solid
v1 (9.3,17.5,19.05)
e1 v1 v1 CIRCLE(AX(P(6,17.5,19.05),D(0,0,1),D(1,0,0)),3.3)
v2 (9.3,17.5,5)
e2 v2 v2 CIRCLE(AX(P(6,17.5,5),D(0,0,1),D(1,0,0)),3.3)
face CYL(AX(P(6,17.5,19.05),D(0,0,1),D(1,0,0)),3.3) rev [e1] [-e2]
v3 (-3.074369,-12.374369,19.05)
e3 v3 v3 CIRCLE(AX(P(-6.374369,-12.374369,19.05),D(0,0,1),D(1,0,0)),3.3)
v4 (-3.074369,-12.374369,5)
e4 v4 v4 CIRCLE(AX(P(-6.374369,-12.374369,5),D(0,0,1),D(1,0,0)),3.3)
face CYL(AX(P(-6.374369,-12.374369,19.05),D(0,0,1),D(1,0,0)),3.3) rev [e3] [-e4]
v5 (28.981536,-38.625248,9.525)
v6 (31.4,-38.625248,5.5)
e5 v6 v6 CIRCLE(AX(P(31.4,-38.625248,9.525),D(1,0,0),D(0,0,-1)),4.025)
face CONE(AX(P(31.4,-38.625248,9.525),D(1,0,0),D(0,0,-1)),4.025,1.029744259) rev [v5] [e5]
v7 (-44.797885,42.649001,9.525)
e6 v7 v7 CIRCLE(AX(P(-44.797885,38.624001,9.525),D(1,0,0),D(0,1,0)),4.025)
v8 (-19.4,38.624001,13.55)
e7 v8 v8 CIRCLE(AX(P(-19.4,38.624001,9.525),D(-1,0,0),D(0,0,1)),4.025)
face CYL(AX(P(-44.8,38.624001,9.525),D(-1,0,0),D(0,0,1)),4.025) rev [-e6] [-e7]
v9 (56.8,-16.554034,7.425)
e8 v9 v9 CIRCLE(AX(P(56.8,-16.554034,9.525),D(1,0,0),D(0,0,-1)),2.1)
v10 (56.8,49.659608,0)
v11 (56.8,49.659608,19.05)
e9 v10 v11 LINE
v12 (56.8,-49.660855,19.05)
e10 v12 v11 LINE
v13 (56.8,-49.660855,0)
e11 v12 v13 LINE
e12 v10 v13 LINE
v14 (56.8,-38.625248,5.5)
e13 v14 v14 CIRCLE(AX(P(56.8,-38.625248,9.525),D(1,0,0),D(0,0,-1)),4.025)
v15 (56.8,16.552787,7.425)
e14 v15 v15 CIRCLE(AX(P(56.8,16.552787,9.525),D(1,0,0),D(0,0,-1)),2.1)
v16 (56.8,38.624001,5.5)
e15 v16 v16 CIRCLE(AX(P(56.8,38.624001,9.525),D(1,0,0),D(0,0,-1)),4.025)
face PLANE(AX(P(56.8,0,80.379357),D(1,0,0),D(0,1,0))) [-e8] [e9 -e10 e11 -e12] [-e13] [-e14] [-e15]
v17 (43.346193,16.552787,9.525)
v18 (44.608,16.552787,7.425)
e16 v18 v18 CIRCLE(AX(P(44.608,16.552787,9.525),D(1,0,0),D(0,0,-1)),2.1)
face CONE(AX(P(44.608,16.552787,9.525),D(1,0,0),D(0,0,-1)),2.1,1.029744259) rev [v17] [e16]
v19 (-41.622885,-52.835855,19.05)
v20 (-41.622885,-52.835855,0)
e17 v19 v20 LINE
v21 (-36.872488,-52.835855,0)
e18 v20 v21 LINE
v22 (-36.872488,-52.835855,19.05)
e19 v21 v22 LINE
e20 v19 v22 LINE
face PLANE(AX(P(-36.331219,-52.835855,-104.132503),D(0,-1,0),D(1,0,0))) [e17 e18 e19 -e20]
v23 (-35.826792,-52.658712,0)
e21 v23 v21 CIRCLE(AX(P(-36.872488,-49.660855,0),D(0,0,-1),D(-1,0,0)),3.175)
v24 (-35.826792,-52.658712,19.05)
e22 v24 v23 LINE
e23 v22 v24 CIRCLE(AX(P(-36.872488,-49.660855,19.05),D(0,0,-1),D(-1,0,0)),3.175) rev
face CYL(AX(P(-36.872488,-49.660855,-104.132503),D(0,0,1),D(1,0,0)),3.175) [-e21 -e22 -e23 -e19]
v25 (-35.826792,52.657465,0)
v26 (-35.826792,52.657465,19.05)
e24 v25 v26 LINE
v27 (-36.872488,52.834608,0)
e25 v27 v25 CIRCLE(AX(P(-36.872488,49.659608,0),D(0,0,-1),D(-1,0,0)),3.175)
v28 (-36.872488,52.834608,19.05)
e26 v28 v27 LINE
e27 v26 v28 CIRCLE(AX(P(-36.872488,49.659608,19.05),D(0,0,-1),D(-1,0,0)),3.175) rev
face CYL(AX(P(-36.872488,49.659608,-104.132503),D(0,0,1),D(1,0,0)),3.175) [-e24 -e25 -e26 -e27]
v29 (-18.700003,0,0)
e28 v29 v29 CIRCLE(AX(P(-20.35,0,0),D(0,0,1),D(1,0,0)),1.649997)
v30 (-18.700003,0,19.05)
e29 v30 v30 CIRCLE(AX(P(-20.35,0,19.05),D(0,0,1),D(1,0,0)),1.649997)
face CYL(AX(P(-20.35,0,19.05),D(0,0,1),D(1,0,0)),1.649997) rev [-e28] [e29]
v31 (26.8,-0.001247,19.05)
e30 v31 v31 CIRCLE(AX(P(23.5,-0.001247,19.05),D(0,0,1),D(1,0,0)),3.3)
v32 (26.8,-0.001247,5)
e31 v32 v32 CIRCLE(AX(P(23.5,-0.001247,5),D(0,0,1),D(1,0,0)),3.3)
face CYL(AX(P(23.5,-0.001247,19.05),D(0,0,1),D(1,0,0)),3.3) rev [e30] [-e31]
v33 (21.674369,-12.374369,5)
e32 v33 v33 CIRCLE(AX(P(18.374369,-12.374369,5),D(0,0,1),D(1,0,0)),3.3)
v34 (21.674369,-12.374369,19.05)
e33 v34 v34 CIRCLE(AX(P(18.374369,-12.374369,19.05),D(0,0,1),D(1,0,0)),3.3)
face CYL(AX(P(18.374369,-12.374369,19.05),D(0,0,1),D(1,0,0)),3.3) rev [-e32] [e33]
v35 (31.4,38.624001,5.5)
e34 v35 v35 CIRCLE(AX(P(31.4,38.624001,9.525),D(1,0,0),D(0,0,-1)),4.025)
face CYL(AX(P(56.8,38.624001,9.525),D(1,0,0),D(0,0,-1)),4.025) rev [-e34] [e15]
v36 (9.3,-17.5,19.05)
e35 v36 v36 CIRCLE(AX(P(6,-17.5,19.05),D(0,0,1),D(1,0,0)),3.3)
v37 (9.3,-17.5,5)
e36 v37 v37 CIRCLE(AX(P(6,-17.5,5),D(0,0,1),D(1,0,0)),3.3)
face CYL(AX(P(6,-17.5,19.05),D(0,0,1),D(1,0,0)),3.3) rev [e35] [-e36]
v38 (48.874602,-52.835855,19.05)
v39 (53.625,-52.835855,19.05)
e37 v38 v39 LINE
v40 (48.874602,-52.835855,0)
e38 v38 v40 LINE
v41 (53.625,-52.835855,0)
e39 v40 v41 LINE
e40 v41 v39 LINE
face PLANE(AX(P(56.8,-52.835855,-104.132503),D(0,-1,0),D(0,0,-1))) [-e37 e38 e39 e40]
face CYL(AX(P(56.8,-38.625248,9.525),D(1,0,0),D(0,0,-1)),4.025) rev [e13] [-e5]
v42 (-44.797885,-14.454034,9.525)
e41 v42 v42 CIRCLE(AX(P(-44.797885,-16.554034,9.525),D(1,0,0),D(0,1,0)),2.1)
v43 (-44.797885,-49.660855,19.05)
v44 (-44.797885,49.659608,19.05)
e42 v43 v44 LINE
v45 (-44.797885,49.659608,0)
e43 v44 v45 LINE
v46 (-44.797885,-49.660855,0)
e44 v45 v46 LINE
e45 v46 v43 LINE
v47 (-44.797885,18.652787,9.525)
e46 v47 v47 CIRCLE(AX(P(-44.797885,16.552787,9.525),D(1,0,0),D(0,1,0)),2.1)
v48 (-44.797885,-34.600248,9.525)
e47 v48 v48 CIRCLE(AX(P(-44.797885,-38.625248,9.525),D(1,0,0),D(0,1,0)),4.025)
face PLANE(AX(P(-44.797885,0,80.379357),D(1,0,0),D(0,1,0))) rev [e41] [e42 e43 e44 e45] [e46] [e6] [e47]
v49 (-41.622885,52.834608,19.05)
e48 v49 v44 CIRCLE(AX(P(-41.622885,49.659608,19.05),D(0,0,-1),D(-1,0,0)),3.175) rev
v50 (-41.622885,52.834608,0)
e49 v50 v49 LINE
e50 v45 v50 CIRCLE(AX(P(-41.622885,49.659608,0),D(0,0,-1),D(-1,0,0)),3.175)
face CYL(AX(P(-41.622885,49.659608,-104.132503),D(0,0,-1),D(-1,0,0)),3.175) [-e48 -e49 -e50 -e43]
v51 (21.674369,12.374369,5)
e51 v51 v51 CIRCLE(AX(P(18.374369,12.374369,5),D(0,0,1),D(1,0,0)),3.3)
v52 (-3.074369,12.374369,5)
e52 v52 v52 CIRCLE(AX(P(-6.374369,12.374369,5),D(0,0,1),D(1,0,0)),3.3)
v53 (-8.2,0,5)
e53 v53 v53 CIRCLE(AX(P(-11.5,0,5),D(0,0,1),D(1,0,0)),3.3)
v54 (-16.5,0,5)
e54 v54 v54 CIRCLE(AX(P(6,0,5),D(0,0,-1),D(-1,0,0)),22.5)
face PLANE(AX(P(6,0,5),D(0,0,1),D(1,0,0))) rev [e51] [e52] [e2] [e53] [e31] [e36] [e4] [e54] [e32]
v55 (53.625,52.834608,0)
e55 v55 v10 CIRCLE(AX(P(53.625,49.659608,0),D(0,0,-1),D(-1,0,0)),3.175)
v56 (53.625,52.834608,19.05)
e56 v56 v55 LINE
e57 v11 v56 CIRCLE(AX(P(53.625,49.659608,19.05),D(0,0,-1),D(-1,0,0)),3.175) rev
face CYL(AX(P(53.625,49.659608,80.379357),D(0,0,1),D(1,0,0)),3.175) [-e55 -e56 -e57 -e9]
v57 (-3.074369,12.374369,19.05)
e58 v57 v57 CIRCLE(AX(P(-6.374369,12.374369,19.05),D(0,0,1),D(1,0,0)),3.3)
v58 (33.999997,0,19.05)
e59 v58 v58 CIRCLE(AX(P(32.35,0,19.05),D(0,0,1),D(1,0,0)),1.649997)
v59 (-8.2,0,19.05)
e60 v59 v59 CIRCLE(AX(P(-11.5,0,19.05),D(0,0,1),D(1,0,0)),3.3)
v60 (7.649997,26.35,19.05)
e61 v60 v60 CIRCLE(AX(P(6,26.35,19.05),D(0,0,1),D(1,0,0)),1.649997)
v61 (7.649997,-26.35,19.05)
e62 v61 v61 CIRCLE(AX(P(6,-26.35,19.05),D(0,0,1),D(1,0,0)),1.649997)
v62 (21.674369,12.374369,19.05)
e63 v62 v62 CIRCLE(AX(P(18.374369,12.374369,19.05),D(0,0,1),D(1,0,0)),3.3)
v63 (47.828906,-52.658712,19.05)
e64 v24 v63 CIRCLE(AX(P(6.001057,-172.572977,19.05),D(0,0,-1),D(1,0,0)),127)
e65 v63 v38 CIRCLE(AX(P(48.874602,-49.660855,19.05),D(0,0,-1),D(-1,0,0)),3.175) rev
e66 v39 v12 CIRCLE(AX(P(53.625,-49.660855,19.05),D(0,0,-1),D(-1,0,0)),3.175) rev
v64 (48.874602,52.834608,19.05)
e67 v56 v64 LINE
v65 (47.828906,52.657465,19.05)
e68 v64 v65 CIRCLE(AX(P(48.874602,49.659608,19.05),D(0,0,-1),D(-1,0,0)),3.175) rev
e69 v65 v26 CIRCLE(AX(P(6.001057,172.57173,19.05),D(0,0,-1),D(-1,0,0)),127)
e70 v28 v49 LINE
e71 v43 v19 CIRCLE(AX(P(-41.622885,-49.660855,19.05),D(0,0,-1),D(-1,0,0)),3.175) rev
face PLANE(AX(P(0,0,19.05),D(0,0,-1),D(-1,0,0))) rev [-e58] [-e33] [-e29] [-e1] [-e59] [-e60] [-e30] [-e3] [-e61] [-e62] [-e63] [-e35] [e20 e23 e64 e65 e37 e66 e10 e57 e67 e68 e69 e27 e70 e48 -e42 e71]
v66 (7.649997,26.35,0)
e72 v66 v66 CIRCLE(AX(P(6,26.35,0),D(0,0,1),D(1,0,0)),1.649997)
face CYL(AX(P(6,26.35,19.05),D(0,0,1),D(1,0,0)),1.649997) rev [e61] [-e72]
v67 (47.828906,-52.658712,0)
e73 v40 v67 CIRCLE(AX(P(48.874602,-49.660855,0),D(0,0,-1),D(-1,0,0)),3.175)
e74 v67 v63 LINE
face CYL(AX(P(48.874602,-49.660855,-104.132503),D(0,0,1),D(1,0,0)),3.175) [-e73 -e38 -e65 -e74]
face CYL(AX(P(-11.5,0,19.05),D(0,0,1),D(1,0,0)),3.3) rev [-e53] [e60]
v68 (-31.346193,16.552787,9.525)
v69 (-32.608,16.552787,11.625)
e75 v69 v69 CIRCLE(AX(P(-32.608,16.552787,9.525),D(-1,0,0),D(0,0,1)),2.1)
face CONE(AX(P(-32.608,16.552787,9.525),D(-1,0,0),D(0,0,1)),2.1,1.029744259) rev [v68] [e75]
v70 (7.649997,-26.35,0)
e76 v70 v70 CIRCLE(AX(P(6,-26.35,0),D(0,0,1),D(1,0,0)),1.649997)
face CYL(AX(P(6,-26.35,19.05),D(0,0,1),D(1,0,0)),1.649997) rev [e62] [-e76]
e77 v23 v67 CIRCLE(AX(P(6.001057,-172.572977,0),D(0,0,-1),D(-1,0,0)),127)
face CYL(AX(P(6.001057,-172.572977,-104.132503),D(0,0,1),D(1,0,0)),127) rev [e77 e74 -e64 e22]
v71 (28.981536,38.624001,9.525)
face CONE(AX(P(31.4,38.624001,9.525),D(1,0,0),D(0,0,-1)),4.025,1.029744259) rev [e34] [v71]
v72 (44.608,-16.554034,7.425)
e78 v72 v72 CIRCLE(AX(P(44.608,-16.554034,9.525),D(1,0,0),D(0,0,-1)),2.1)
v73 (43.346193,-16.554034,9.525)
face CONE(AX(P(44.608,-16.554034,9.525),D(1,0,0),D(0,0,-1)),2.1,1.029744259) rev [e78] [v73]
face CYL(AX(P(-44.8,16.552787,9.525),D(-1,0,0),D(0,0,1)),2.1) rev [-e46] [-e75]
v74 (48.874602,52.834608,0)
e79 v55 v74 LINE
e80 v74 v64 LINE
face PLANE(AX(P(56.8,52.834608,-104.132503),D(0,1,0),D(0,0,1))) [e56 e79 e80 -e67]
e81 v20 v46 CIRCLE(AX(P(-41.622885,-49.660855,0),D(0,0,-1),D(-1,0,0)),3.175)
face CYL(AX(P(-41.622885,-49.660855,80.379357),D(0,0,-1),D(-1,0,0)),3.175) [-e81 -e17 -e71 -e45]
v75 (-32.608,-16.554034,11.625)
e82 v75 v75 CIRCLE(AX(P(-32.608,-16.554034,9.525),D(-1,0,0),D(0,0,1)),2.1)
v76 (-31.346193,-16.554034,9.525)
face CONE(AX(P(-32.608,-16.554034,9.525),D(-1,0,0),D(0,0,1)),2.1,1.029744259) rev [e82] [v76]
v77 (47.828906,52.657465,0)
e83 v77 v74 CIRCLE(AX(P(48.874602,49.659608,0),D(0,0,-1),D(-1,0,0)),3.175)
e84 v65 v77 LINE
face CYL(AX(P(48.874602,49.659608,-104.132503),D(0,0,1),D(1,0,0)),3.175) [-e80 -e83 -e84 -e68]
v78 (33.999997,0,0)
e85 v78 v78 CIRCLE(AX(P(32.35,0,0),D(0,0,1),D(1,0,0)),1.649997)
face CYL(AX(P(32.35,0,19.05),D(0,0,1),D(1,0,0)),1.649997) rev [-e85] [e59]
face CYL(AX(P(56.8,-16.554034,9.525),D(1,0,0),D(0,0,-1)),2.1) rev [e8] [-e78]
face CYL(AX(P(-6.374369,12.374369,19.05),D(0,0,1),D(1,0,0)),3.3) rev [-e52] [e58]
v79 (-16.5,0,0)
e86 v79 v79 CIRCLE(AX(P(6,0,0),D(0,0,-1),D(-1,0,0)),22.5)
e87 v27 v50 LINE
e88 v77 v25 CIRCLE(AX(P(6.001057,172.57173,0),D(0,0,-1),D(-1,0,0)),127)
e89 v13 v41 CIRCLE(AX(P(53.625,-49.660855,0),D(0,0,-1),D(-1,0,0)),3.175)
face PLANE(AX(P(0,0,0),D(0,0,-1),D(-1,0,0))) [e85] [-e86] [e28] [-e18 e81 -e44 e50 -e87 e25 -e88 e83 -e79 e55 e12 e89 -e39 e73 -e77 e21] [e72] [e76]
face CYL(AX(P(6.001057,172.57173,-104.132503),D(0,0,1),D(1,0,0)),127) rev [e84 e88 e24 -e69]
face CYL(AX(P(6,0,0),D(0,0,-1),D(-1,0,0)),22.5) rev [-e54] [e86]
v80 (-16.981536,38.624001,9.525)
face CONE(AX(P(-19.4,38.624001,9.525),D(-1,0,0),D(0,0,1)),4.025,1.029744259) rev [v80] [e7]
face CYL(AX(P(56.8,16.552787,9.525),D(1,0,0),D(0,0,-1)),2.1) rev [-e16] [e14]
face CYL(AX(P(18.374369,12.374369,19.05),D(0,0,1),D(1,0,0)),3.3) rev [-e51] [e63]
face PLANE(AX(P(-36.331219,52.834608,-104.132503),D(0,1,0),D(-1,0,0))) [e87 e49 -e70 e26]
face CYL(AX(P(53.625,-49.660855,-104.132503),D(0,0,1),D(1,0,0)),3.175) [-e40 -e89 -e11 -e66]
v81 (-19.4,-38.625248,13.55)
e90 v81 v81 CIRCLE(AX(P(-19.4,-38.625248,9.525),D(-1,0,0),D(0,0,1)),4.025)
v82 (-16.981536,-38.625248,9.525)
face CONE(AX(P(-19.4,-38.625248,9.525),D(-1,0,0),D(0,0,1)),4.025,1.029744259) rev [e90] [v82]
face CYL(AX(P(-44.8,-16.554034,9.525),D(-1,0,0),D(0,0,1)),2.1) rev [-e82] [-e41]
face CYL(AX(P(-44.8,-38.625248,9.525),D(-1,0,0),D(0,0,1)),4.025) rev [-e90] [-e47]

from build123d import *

# Parameters (mm, degrees)
BOSS_EXTRUDE1_DEPTH                         = 19.05
F_1_3_4_CLEARANCE_HOLE1_D                   = 45
F_1_3_4_CLEARANCE_HOLE1_DEPTH               = 5
F_1_4_CLEARANCE_HOLE3_D                     = 6.6
F_1_4_CLEARANCE_HOLE3_DEPTH                 = 19.05
BOSS_EXTRUDE2_DEPTH                         = 19.05
SKETCH21_R                                  = 30
CUT_EXTRUDE1_DEPTH                          = 81.6728269
BOSS_EXTRUDE5_DEPTH                         = 19.05
BOSS_EXTRUDE6_DEPTH                         = 19.05
FILLET2_R                                   = 13
SKETCH29_W                                  = 12.7
SKETCH29_H                                  = 60
BOSS_EXTRUDE7_DEPTH                         = 19.05
BOSS_EXTRUDE8_START                         = -19.05
BOSS_EXTRUDE8_DEPTH                         = 19.05
FILLET3_R                                   = 3.175
F_8_0MM_DOWEL_HOLE1_AT_2_COUNT              = 2
F_8_0MM_DOWEL_HOLE1_AT_2_PITCH              = 77.249249372
TAPPED_HOLE_FOR_M4X0_7_HELICOIL1_AT_2_COUNT = 2
TAPPED_HOLE_FOR_M4X0_7_HELICOIL1_AT_2_PITCH = 33.106821059
F_4_CLEARANCE_HOLE2_D                       = 3.2999934


# Read off the part's stored shape, not the designer's step: Markup2
with BuildPart() as part:
    # Sketch1 → Boss-Extrude1 (new body)
    with BuildSketch(Plane(origin=(0, 0, 0), x_dir=(-1, 0, 0), z_dir=(0, 0, -1))):
        with BuildLine():
            Line((44.45, 0), (44.45, 60))
            Line((44.45, 60), (-44.45, 60))
            Line((-44.45, 60), (-44.45, 0))
            ThreePointArc((-44.45, 0), (0, -44.45), (44.45, 0))
        make_face()
    extrude(amount=-BOSS_EXTRUDE1_DEPTH)

    # 1-3/4 Clearance Hole1
    with Locations(Plane(origin=(0, 0, 0), x_dir=(-1, 0, 0), z_dir=(0, 0, -1))):
        with Locations((-6, 0)):
            Hole(F_1_3_4_CLEARANCE_HOLE1_D / 2, depth=F_1_3_4_CLEARANCE_HOLE1_DEPTH)

    # 1/4 Clearance Hole3
    with Locations(Plane.XY.offset(19.05)):
        with Locations((18.374368671, 12.374368671), (23.499999956, -0.001247108), (18.374368671, -12.374368671), (6, -17.5), (-6.374368671, -12.374368671), (-11.5, 0), (-6.374368671, 12.374368671), (6, 17.5)):
            Hole(F_1_4_CLEARANCE_HOLE3_D / 2, depth=F_1_4_CLEARANCE_HOLE3_DEPTH)

    # Sketch18 → Boss-Extrude2 (add)
    with BuildSketch(Plane(origin=(0, 0, 0), x_dir=(-1, 0, 0), z_dir=(0, 0, -1))):
        with BuildLine():
            Line((-44.45, 0), (-50.45, 0))
            ThreePointArc((-50.45, 0), (-37.430896424, -31.430896424), (-6, -44.45))
            Line((-6, -44.45), (0, -44.45))
            ThreePointArc((0, -44.45), (-31.430896424, -31.430896424), (-44.45, 0))
        make_face()
    extrude(amount=-BOSS_EXTRUDE2_DEPTH)

    # Sketch21 → Cut-Extrude1 (cut, through all)
    with BuildSketch(Plane.XY.offset(19.05)):
        with BuildLine():
            Line((-44.45, 60), (-44.45, 0))
            ThreePointArc((-44.45, 0), (-31.430896424, -31.430896424), (0, -44.45))
            Line((0, -44.45), (6, -44.45))
            ThreePointArc((6, -44.45), (37.430896424, -31.430896424), (50.45, 0))
            Line((50.45, 0), (44.45, 0))
            Line((44.45, 0), (44.45, 60))
            Line((44.45, 60), (-44.45, 60))
        make_face()
        with Locations((5.999999978, -0.000623554)):
            Circle(SKETCH21_R, mode=Mode.SUBTRACT)
    extrude(amount=-CUT_EXTRUDE1_DEPTH, mode=Mode.SUBTRACT)

    # Sketch22 → Boss-Extrude5 (add)
    with BuildSketch(Plane.XY.offset(19.05)):
        with BuildLine():
            Line((44.099999978, -30.000623554), (44.099999978, 29.999376446))
            Line((44.099999978, 29.999376446), (5.999999978, 29.999376446))
            ThreePointArc((5.999999978, 29.999376446), (35.999999978, -0.000623554), (5.999999978, -30.000623554))
            Line((5.999999978, -30.000623554), (44.099999978, -30.000623554))
        make_face()
    boss_extrude5 = extrude(amount=-BOSS_EXTRUDE5_DEPTH)

    # Mirror1: Boss-Extrude5 across plane
    add(boss_extrude5.mirror(Plane(origin=(5.999999978, 0, 0), x_dir=(0, 0, 1), z_dir=(1, 0, 0))))

    # Sketch28 → Boss-Extrude6 (add)
    with BuildSketch(Plane.XY.offset(19.05)):
        with BuildLine():
            Line((-26.798858004, 29.999376446), (38.798858004, 29.999376446))
            ThreePointArc((38.798858004, 29.999376446), (6, 44.448752892), (-26.798858004, 29.999376446))
        make_face()
        with BuildLine():
            ThreePointArc((-26.798858004, -30.000623554), (6, -44.45), (38.798858004, -30.000623554))
            Line((38.798858004, -30.000623554), (-26.798858004, -30.000623554))
        make_face()
    extrude(amount=-BOSS_EXTRUDE6_DEPTH)

    # Fillet2
    fillet2_edges = [part.edges().sort_by_distance(p)[0] for p in [
        (-26.798858004, 29.999376446, 9.525),
        (38.798858004, 29.999376446, 9.525),
        (38.798858004, -30.000623554, 9.525),
        (-26.798858004, -30.000623554, 9.525),
    ]]
    fillet(fillet2_edges, radius=FILLET2_R)

    # Sketch29 → Boss-Extrude7 (add)
    with BuildSketch(Plane.XY):
        with Locations((50.449999978, -0.000623554)):
            Rectangle(SKETCH29_W, SKETCH29_H)
        with Locations((-38.447885426, -0.000623554)):
            Rectangle(SKETCH29_W, SKETCH29_H)
    extrude(amount=BOSS_EXTRUDE7_DEPTH)

    # Sketch40 → Boss-Extrude8 (add)
    with BuildSketch(Plane.XY.offset(19.05).offset(BOSS_EXTRUDE8_START)):
        with BuildLine():
            Line((56.799999978, -30.000623554), (44.097885426, -30.000623554))
            ThreePointArc((44.097885426, -30.000623554), (39.487811488, -30.845492198), (35.476953998, -33.27028228))
            ThreePointArc((35.476953998, -33.27028228), (6, -44.45), (-23.476953998, -33.27028228))
            ThreePointArc((-23.476953998, -33.27028228), (-27.487811488, -30.845492198), (-32.097885426, -30.000623554))
            Line((-32.097885426, -30.000623554), (-44.797885426, -30.000623554))
            Line((-44.797885426, -30.000623554), (-44.797885426, -52.835855224))
            Line((-44.797885426, -52.835855224), (-36.33121876, -52.835855224))
            ThreePointArc((-36.33121876, -52.835855224), (6.001057276, -45.572977311), (48.333333311, -52.835855224))
            Line((48.333333311, -52.835855224), (56.799999978, -52.835855224))
            Line((56.799999978, -52.835855224), (56.799999978, -30.000623554))
        make_face()
        with BuildLine():
            Line((-36.33121876, 52.834608116), (-44.797885426, 52.834608116))
            Line((-44.797885426, 52.834608116), (-44.797885426, 29.999376446))
            Line((-44.797885426, 29.999376446), (-32.097885426, 29.999376446))
            ThreePointArc((-32.097885426, 29.999376446), (-27.487811488, 30.84424509), (-23.476953998, 33.269035172))
            ThreePointArc((-23.476953998, 33.269035172), (6, 44.448752892), (35.476953998, 33.269035172))
            ThreePointArc((35.476953998, 33.269035172), (39.487811488, 30.84424509), (44.097885426, 29.999376446))
            Line((44.097885426, 29.999376446), (56.799999978, 29.999376446))
            Line((56.799999978, 29.999376446), (56.799999978, 52.834608116))
            Line((56.799999978, 52.834608116), (48.333333311, 52.834608116))
            ThreePointArc((48.333333311, 52.834608116), (6.001057276, 45.571730203), (-36.33121876, 52.834608116))
        make_face()
    extrude(amount=BOSS_EXTRUDE8_DEPTH)

    # Fillet3
    fillet3_edges = [part.edges().sort_by_distance(p)[0] for p in [
        (-44.797885426, -52.835855224, 9.525),
        (-36.33121876, -52.835855224, 9.525),
        (48.333333311, -52.835855224, 9.525),
        (56.799999978, -52.835855224, 9.525),
        (56.799999978, 52.834608116, 9.525),
        (48.333333311, 52.834608116, 9.525),
        (-36.33121876, 52.834608116, 9.525),
        (-44.797885426, 52.834608116, 9.525),
    ]]
    fillet(fillet3_edges, radius=FILLET3_R)

    # Sketch49 → Ø8.0mm Dowel Hole1 (revolve, cut)
    with BuildSketch(Plane(origin=(56.799999978, 38.624001078, 9.525), x_dir=(0, 0, -1), z_dir=(0, 1, 0))):
        Polygon((0, 0), (0, 27.818463992), (4.025, 25.4), (4.025, 0), align=None)
    f_8_0mm_dowel_hole1 = revolve(axis=Axis((63.149999978, 38.624001078, 9.525), (-1, 0, 0)), mode=Mode.SUBTRACT)

    # Ø8.0mm Dowel Hole1 at 2: Ø8.0mm Dowel Hole1 ×2
    with Locations(*[(0, -i * F_8_0MM_DOWEL_HOLE1_AT_2_PITCH, 0) for i in range(1, F_8_0MM_DOWEL_HOLE1_AT_2_COUNT)]):
        add(f_8_0mm_dowel_hole1, mode=Mode.SUBTRACT)

    # Sketch52 → Tapped Hole for M4x0.7 Helicoil1 (revolve, cut)
    with BuildSketch(Plane(origin=(56.799999978, 16.552787003, 9.525), x_dir=(0, 0, -1), z_dir=(0, 1, 0))):
        Polygon((0, 0), (0, 13.4538073), (2.1, 12.192), (2.1, 0), align=None)
    tapped_hole_for_m4x0_7_helicoil1 = revolve(axis=Axis((63.149999978, 16.552787003, 9.525), (-1, 0, 0)), mode=Mode.SUBTRACT)

    # Tapped Hole for M4x0.7 Helicoil1 at 2: Tapped Hole for M4x0.7 Helicoil1 ×2
    with Locations(*[(0, -i * TAPPED_HOLE_FOR_M4X0_7_HELICOIL1_AT_2_PITCH, 0) for i in range(1, TAPPED_HOLE_FOR_M4X0_7_HELICOIL1_AT_2_COUNT)]):
        add(tapped_hole_for_m4x0_7_helicoil1, mode=Mode.SUBTRACT)

    # Mirror6: Ø8.0mm Dowel Hole1, Tapped Hole for M4x0.7 Helicoil1 across plane
    add(f_8_0mm_dowel_hole1.mirror(Plane(origin=(5.999999978, 0, 0), x_dir=(0, 0, 1), z_dir=(1, 0, 0))), mode=Mode.SUBTRACT)
    add(tapped_hole_for_m4x0_7_helicoil1.mirror(Plane(origin=(5.999999978, 0, 0), x_dir=(0, 0, 1), z_dir=(1, 0, 0))), mode=Mode.SUBTRACT)

    # Mirror6 copy 1 sketch → Mirror6 copy 1 (revolve, cut)
    with BuildSketch(Plane(origin=(-44.800000022, -38.625248294, 9.525), x_dir=(0, 0, -1), z_dir=(0, 1, 0))):
        Polygon((0, 0), (0, -27.818463992), (4.025, -25.4), (4.025, 0), align=None)
    revolve(axis=Axis((-51.150000022, -38.625248294, 9.525), (-1, 0, 0)), mode=Mode.SUBTRACT)

    # Mirror6 copy 2 sketch → Mirror6 copy 2 (revolve, cut)
    with BuildSketch(Plane(origin=(-44.800000022, -16.554034056, 9.525), x_dir=(0, 0, -1), z_dir=(0, 1, 0))):
        Polygon((0, 0), (0, -13.4538073), (2.1, -12.192), (2.1, 0), align=None)
    revolve(axis=Axis((-51.150000022, -16.554034056, 9.525), (-1, 0, 0)), mode=Mode.SUBTRACT)

    # #4 Clearance Hole2 (through all)
    with Locations(Plane.XY.offset(19.05)):
        with Locations((32.350000005, 0), (6, 26.350000005), (-20.350000005, 0), (6, -26.350000005)):
            Hole(F_4_CLEARANCE_HOLE2_D / 2)


solid = part.part
